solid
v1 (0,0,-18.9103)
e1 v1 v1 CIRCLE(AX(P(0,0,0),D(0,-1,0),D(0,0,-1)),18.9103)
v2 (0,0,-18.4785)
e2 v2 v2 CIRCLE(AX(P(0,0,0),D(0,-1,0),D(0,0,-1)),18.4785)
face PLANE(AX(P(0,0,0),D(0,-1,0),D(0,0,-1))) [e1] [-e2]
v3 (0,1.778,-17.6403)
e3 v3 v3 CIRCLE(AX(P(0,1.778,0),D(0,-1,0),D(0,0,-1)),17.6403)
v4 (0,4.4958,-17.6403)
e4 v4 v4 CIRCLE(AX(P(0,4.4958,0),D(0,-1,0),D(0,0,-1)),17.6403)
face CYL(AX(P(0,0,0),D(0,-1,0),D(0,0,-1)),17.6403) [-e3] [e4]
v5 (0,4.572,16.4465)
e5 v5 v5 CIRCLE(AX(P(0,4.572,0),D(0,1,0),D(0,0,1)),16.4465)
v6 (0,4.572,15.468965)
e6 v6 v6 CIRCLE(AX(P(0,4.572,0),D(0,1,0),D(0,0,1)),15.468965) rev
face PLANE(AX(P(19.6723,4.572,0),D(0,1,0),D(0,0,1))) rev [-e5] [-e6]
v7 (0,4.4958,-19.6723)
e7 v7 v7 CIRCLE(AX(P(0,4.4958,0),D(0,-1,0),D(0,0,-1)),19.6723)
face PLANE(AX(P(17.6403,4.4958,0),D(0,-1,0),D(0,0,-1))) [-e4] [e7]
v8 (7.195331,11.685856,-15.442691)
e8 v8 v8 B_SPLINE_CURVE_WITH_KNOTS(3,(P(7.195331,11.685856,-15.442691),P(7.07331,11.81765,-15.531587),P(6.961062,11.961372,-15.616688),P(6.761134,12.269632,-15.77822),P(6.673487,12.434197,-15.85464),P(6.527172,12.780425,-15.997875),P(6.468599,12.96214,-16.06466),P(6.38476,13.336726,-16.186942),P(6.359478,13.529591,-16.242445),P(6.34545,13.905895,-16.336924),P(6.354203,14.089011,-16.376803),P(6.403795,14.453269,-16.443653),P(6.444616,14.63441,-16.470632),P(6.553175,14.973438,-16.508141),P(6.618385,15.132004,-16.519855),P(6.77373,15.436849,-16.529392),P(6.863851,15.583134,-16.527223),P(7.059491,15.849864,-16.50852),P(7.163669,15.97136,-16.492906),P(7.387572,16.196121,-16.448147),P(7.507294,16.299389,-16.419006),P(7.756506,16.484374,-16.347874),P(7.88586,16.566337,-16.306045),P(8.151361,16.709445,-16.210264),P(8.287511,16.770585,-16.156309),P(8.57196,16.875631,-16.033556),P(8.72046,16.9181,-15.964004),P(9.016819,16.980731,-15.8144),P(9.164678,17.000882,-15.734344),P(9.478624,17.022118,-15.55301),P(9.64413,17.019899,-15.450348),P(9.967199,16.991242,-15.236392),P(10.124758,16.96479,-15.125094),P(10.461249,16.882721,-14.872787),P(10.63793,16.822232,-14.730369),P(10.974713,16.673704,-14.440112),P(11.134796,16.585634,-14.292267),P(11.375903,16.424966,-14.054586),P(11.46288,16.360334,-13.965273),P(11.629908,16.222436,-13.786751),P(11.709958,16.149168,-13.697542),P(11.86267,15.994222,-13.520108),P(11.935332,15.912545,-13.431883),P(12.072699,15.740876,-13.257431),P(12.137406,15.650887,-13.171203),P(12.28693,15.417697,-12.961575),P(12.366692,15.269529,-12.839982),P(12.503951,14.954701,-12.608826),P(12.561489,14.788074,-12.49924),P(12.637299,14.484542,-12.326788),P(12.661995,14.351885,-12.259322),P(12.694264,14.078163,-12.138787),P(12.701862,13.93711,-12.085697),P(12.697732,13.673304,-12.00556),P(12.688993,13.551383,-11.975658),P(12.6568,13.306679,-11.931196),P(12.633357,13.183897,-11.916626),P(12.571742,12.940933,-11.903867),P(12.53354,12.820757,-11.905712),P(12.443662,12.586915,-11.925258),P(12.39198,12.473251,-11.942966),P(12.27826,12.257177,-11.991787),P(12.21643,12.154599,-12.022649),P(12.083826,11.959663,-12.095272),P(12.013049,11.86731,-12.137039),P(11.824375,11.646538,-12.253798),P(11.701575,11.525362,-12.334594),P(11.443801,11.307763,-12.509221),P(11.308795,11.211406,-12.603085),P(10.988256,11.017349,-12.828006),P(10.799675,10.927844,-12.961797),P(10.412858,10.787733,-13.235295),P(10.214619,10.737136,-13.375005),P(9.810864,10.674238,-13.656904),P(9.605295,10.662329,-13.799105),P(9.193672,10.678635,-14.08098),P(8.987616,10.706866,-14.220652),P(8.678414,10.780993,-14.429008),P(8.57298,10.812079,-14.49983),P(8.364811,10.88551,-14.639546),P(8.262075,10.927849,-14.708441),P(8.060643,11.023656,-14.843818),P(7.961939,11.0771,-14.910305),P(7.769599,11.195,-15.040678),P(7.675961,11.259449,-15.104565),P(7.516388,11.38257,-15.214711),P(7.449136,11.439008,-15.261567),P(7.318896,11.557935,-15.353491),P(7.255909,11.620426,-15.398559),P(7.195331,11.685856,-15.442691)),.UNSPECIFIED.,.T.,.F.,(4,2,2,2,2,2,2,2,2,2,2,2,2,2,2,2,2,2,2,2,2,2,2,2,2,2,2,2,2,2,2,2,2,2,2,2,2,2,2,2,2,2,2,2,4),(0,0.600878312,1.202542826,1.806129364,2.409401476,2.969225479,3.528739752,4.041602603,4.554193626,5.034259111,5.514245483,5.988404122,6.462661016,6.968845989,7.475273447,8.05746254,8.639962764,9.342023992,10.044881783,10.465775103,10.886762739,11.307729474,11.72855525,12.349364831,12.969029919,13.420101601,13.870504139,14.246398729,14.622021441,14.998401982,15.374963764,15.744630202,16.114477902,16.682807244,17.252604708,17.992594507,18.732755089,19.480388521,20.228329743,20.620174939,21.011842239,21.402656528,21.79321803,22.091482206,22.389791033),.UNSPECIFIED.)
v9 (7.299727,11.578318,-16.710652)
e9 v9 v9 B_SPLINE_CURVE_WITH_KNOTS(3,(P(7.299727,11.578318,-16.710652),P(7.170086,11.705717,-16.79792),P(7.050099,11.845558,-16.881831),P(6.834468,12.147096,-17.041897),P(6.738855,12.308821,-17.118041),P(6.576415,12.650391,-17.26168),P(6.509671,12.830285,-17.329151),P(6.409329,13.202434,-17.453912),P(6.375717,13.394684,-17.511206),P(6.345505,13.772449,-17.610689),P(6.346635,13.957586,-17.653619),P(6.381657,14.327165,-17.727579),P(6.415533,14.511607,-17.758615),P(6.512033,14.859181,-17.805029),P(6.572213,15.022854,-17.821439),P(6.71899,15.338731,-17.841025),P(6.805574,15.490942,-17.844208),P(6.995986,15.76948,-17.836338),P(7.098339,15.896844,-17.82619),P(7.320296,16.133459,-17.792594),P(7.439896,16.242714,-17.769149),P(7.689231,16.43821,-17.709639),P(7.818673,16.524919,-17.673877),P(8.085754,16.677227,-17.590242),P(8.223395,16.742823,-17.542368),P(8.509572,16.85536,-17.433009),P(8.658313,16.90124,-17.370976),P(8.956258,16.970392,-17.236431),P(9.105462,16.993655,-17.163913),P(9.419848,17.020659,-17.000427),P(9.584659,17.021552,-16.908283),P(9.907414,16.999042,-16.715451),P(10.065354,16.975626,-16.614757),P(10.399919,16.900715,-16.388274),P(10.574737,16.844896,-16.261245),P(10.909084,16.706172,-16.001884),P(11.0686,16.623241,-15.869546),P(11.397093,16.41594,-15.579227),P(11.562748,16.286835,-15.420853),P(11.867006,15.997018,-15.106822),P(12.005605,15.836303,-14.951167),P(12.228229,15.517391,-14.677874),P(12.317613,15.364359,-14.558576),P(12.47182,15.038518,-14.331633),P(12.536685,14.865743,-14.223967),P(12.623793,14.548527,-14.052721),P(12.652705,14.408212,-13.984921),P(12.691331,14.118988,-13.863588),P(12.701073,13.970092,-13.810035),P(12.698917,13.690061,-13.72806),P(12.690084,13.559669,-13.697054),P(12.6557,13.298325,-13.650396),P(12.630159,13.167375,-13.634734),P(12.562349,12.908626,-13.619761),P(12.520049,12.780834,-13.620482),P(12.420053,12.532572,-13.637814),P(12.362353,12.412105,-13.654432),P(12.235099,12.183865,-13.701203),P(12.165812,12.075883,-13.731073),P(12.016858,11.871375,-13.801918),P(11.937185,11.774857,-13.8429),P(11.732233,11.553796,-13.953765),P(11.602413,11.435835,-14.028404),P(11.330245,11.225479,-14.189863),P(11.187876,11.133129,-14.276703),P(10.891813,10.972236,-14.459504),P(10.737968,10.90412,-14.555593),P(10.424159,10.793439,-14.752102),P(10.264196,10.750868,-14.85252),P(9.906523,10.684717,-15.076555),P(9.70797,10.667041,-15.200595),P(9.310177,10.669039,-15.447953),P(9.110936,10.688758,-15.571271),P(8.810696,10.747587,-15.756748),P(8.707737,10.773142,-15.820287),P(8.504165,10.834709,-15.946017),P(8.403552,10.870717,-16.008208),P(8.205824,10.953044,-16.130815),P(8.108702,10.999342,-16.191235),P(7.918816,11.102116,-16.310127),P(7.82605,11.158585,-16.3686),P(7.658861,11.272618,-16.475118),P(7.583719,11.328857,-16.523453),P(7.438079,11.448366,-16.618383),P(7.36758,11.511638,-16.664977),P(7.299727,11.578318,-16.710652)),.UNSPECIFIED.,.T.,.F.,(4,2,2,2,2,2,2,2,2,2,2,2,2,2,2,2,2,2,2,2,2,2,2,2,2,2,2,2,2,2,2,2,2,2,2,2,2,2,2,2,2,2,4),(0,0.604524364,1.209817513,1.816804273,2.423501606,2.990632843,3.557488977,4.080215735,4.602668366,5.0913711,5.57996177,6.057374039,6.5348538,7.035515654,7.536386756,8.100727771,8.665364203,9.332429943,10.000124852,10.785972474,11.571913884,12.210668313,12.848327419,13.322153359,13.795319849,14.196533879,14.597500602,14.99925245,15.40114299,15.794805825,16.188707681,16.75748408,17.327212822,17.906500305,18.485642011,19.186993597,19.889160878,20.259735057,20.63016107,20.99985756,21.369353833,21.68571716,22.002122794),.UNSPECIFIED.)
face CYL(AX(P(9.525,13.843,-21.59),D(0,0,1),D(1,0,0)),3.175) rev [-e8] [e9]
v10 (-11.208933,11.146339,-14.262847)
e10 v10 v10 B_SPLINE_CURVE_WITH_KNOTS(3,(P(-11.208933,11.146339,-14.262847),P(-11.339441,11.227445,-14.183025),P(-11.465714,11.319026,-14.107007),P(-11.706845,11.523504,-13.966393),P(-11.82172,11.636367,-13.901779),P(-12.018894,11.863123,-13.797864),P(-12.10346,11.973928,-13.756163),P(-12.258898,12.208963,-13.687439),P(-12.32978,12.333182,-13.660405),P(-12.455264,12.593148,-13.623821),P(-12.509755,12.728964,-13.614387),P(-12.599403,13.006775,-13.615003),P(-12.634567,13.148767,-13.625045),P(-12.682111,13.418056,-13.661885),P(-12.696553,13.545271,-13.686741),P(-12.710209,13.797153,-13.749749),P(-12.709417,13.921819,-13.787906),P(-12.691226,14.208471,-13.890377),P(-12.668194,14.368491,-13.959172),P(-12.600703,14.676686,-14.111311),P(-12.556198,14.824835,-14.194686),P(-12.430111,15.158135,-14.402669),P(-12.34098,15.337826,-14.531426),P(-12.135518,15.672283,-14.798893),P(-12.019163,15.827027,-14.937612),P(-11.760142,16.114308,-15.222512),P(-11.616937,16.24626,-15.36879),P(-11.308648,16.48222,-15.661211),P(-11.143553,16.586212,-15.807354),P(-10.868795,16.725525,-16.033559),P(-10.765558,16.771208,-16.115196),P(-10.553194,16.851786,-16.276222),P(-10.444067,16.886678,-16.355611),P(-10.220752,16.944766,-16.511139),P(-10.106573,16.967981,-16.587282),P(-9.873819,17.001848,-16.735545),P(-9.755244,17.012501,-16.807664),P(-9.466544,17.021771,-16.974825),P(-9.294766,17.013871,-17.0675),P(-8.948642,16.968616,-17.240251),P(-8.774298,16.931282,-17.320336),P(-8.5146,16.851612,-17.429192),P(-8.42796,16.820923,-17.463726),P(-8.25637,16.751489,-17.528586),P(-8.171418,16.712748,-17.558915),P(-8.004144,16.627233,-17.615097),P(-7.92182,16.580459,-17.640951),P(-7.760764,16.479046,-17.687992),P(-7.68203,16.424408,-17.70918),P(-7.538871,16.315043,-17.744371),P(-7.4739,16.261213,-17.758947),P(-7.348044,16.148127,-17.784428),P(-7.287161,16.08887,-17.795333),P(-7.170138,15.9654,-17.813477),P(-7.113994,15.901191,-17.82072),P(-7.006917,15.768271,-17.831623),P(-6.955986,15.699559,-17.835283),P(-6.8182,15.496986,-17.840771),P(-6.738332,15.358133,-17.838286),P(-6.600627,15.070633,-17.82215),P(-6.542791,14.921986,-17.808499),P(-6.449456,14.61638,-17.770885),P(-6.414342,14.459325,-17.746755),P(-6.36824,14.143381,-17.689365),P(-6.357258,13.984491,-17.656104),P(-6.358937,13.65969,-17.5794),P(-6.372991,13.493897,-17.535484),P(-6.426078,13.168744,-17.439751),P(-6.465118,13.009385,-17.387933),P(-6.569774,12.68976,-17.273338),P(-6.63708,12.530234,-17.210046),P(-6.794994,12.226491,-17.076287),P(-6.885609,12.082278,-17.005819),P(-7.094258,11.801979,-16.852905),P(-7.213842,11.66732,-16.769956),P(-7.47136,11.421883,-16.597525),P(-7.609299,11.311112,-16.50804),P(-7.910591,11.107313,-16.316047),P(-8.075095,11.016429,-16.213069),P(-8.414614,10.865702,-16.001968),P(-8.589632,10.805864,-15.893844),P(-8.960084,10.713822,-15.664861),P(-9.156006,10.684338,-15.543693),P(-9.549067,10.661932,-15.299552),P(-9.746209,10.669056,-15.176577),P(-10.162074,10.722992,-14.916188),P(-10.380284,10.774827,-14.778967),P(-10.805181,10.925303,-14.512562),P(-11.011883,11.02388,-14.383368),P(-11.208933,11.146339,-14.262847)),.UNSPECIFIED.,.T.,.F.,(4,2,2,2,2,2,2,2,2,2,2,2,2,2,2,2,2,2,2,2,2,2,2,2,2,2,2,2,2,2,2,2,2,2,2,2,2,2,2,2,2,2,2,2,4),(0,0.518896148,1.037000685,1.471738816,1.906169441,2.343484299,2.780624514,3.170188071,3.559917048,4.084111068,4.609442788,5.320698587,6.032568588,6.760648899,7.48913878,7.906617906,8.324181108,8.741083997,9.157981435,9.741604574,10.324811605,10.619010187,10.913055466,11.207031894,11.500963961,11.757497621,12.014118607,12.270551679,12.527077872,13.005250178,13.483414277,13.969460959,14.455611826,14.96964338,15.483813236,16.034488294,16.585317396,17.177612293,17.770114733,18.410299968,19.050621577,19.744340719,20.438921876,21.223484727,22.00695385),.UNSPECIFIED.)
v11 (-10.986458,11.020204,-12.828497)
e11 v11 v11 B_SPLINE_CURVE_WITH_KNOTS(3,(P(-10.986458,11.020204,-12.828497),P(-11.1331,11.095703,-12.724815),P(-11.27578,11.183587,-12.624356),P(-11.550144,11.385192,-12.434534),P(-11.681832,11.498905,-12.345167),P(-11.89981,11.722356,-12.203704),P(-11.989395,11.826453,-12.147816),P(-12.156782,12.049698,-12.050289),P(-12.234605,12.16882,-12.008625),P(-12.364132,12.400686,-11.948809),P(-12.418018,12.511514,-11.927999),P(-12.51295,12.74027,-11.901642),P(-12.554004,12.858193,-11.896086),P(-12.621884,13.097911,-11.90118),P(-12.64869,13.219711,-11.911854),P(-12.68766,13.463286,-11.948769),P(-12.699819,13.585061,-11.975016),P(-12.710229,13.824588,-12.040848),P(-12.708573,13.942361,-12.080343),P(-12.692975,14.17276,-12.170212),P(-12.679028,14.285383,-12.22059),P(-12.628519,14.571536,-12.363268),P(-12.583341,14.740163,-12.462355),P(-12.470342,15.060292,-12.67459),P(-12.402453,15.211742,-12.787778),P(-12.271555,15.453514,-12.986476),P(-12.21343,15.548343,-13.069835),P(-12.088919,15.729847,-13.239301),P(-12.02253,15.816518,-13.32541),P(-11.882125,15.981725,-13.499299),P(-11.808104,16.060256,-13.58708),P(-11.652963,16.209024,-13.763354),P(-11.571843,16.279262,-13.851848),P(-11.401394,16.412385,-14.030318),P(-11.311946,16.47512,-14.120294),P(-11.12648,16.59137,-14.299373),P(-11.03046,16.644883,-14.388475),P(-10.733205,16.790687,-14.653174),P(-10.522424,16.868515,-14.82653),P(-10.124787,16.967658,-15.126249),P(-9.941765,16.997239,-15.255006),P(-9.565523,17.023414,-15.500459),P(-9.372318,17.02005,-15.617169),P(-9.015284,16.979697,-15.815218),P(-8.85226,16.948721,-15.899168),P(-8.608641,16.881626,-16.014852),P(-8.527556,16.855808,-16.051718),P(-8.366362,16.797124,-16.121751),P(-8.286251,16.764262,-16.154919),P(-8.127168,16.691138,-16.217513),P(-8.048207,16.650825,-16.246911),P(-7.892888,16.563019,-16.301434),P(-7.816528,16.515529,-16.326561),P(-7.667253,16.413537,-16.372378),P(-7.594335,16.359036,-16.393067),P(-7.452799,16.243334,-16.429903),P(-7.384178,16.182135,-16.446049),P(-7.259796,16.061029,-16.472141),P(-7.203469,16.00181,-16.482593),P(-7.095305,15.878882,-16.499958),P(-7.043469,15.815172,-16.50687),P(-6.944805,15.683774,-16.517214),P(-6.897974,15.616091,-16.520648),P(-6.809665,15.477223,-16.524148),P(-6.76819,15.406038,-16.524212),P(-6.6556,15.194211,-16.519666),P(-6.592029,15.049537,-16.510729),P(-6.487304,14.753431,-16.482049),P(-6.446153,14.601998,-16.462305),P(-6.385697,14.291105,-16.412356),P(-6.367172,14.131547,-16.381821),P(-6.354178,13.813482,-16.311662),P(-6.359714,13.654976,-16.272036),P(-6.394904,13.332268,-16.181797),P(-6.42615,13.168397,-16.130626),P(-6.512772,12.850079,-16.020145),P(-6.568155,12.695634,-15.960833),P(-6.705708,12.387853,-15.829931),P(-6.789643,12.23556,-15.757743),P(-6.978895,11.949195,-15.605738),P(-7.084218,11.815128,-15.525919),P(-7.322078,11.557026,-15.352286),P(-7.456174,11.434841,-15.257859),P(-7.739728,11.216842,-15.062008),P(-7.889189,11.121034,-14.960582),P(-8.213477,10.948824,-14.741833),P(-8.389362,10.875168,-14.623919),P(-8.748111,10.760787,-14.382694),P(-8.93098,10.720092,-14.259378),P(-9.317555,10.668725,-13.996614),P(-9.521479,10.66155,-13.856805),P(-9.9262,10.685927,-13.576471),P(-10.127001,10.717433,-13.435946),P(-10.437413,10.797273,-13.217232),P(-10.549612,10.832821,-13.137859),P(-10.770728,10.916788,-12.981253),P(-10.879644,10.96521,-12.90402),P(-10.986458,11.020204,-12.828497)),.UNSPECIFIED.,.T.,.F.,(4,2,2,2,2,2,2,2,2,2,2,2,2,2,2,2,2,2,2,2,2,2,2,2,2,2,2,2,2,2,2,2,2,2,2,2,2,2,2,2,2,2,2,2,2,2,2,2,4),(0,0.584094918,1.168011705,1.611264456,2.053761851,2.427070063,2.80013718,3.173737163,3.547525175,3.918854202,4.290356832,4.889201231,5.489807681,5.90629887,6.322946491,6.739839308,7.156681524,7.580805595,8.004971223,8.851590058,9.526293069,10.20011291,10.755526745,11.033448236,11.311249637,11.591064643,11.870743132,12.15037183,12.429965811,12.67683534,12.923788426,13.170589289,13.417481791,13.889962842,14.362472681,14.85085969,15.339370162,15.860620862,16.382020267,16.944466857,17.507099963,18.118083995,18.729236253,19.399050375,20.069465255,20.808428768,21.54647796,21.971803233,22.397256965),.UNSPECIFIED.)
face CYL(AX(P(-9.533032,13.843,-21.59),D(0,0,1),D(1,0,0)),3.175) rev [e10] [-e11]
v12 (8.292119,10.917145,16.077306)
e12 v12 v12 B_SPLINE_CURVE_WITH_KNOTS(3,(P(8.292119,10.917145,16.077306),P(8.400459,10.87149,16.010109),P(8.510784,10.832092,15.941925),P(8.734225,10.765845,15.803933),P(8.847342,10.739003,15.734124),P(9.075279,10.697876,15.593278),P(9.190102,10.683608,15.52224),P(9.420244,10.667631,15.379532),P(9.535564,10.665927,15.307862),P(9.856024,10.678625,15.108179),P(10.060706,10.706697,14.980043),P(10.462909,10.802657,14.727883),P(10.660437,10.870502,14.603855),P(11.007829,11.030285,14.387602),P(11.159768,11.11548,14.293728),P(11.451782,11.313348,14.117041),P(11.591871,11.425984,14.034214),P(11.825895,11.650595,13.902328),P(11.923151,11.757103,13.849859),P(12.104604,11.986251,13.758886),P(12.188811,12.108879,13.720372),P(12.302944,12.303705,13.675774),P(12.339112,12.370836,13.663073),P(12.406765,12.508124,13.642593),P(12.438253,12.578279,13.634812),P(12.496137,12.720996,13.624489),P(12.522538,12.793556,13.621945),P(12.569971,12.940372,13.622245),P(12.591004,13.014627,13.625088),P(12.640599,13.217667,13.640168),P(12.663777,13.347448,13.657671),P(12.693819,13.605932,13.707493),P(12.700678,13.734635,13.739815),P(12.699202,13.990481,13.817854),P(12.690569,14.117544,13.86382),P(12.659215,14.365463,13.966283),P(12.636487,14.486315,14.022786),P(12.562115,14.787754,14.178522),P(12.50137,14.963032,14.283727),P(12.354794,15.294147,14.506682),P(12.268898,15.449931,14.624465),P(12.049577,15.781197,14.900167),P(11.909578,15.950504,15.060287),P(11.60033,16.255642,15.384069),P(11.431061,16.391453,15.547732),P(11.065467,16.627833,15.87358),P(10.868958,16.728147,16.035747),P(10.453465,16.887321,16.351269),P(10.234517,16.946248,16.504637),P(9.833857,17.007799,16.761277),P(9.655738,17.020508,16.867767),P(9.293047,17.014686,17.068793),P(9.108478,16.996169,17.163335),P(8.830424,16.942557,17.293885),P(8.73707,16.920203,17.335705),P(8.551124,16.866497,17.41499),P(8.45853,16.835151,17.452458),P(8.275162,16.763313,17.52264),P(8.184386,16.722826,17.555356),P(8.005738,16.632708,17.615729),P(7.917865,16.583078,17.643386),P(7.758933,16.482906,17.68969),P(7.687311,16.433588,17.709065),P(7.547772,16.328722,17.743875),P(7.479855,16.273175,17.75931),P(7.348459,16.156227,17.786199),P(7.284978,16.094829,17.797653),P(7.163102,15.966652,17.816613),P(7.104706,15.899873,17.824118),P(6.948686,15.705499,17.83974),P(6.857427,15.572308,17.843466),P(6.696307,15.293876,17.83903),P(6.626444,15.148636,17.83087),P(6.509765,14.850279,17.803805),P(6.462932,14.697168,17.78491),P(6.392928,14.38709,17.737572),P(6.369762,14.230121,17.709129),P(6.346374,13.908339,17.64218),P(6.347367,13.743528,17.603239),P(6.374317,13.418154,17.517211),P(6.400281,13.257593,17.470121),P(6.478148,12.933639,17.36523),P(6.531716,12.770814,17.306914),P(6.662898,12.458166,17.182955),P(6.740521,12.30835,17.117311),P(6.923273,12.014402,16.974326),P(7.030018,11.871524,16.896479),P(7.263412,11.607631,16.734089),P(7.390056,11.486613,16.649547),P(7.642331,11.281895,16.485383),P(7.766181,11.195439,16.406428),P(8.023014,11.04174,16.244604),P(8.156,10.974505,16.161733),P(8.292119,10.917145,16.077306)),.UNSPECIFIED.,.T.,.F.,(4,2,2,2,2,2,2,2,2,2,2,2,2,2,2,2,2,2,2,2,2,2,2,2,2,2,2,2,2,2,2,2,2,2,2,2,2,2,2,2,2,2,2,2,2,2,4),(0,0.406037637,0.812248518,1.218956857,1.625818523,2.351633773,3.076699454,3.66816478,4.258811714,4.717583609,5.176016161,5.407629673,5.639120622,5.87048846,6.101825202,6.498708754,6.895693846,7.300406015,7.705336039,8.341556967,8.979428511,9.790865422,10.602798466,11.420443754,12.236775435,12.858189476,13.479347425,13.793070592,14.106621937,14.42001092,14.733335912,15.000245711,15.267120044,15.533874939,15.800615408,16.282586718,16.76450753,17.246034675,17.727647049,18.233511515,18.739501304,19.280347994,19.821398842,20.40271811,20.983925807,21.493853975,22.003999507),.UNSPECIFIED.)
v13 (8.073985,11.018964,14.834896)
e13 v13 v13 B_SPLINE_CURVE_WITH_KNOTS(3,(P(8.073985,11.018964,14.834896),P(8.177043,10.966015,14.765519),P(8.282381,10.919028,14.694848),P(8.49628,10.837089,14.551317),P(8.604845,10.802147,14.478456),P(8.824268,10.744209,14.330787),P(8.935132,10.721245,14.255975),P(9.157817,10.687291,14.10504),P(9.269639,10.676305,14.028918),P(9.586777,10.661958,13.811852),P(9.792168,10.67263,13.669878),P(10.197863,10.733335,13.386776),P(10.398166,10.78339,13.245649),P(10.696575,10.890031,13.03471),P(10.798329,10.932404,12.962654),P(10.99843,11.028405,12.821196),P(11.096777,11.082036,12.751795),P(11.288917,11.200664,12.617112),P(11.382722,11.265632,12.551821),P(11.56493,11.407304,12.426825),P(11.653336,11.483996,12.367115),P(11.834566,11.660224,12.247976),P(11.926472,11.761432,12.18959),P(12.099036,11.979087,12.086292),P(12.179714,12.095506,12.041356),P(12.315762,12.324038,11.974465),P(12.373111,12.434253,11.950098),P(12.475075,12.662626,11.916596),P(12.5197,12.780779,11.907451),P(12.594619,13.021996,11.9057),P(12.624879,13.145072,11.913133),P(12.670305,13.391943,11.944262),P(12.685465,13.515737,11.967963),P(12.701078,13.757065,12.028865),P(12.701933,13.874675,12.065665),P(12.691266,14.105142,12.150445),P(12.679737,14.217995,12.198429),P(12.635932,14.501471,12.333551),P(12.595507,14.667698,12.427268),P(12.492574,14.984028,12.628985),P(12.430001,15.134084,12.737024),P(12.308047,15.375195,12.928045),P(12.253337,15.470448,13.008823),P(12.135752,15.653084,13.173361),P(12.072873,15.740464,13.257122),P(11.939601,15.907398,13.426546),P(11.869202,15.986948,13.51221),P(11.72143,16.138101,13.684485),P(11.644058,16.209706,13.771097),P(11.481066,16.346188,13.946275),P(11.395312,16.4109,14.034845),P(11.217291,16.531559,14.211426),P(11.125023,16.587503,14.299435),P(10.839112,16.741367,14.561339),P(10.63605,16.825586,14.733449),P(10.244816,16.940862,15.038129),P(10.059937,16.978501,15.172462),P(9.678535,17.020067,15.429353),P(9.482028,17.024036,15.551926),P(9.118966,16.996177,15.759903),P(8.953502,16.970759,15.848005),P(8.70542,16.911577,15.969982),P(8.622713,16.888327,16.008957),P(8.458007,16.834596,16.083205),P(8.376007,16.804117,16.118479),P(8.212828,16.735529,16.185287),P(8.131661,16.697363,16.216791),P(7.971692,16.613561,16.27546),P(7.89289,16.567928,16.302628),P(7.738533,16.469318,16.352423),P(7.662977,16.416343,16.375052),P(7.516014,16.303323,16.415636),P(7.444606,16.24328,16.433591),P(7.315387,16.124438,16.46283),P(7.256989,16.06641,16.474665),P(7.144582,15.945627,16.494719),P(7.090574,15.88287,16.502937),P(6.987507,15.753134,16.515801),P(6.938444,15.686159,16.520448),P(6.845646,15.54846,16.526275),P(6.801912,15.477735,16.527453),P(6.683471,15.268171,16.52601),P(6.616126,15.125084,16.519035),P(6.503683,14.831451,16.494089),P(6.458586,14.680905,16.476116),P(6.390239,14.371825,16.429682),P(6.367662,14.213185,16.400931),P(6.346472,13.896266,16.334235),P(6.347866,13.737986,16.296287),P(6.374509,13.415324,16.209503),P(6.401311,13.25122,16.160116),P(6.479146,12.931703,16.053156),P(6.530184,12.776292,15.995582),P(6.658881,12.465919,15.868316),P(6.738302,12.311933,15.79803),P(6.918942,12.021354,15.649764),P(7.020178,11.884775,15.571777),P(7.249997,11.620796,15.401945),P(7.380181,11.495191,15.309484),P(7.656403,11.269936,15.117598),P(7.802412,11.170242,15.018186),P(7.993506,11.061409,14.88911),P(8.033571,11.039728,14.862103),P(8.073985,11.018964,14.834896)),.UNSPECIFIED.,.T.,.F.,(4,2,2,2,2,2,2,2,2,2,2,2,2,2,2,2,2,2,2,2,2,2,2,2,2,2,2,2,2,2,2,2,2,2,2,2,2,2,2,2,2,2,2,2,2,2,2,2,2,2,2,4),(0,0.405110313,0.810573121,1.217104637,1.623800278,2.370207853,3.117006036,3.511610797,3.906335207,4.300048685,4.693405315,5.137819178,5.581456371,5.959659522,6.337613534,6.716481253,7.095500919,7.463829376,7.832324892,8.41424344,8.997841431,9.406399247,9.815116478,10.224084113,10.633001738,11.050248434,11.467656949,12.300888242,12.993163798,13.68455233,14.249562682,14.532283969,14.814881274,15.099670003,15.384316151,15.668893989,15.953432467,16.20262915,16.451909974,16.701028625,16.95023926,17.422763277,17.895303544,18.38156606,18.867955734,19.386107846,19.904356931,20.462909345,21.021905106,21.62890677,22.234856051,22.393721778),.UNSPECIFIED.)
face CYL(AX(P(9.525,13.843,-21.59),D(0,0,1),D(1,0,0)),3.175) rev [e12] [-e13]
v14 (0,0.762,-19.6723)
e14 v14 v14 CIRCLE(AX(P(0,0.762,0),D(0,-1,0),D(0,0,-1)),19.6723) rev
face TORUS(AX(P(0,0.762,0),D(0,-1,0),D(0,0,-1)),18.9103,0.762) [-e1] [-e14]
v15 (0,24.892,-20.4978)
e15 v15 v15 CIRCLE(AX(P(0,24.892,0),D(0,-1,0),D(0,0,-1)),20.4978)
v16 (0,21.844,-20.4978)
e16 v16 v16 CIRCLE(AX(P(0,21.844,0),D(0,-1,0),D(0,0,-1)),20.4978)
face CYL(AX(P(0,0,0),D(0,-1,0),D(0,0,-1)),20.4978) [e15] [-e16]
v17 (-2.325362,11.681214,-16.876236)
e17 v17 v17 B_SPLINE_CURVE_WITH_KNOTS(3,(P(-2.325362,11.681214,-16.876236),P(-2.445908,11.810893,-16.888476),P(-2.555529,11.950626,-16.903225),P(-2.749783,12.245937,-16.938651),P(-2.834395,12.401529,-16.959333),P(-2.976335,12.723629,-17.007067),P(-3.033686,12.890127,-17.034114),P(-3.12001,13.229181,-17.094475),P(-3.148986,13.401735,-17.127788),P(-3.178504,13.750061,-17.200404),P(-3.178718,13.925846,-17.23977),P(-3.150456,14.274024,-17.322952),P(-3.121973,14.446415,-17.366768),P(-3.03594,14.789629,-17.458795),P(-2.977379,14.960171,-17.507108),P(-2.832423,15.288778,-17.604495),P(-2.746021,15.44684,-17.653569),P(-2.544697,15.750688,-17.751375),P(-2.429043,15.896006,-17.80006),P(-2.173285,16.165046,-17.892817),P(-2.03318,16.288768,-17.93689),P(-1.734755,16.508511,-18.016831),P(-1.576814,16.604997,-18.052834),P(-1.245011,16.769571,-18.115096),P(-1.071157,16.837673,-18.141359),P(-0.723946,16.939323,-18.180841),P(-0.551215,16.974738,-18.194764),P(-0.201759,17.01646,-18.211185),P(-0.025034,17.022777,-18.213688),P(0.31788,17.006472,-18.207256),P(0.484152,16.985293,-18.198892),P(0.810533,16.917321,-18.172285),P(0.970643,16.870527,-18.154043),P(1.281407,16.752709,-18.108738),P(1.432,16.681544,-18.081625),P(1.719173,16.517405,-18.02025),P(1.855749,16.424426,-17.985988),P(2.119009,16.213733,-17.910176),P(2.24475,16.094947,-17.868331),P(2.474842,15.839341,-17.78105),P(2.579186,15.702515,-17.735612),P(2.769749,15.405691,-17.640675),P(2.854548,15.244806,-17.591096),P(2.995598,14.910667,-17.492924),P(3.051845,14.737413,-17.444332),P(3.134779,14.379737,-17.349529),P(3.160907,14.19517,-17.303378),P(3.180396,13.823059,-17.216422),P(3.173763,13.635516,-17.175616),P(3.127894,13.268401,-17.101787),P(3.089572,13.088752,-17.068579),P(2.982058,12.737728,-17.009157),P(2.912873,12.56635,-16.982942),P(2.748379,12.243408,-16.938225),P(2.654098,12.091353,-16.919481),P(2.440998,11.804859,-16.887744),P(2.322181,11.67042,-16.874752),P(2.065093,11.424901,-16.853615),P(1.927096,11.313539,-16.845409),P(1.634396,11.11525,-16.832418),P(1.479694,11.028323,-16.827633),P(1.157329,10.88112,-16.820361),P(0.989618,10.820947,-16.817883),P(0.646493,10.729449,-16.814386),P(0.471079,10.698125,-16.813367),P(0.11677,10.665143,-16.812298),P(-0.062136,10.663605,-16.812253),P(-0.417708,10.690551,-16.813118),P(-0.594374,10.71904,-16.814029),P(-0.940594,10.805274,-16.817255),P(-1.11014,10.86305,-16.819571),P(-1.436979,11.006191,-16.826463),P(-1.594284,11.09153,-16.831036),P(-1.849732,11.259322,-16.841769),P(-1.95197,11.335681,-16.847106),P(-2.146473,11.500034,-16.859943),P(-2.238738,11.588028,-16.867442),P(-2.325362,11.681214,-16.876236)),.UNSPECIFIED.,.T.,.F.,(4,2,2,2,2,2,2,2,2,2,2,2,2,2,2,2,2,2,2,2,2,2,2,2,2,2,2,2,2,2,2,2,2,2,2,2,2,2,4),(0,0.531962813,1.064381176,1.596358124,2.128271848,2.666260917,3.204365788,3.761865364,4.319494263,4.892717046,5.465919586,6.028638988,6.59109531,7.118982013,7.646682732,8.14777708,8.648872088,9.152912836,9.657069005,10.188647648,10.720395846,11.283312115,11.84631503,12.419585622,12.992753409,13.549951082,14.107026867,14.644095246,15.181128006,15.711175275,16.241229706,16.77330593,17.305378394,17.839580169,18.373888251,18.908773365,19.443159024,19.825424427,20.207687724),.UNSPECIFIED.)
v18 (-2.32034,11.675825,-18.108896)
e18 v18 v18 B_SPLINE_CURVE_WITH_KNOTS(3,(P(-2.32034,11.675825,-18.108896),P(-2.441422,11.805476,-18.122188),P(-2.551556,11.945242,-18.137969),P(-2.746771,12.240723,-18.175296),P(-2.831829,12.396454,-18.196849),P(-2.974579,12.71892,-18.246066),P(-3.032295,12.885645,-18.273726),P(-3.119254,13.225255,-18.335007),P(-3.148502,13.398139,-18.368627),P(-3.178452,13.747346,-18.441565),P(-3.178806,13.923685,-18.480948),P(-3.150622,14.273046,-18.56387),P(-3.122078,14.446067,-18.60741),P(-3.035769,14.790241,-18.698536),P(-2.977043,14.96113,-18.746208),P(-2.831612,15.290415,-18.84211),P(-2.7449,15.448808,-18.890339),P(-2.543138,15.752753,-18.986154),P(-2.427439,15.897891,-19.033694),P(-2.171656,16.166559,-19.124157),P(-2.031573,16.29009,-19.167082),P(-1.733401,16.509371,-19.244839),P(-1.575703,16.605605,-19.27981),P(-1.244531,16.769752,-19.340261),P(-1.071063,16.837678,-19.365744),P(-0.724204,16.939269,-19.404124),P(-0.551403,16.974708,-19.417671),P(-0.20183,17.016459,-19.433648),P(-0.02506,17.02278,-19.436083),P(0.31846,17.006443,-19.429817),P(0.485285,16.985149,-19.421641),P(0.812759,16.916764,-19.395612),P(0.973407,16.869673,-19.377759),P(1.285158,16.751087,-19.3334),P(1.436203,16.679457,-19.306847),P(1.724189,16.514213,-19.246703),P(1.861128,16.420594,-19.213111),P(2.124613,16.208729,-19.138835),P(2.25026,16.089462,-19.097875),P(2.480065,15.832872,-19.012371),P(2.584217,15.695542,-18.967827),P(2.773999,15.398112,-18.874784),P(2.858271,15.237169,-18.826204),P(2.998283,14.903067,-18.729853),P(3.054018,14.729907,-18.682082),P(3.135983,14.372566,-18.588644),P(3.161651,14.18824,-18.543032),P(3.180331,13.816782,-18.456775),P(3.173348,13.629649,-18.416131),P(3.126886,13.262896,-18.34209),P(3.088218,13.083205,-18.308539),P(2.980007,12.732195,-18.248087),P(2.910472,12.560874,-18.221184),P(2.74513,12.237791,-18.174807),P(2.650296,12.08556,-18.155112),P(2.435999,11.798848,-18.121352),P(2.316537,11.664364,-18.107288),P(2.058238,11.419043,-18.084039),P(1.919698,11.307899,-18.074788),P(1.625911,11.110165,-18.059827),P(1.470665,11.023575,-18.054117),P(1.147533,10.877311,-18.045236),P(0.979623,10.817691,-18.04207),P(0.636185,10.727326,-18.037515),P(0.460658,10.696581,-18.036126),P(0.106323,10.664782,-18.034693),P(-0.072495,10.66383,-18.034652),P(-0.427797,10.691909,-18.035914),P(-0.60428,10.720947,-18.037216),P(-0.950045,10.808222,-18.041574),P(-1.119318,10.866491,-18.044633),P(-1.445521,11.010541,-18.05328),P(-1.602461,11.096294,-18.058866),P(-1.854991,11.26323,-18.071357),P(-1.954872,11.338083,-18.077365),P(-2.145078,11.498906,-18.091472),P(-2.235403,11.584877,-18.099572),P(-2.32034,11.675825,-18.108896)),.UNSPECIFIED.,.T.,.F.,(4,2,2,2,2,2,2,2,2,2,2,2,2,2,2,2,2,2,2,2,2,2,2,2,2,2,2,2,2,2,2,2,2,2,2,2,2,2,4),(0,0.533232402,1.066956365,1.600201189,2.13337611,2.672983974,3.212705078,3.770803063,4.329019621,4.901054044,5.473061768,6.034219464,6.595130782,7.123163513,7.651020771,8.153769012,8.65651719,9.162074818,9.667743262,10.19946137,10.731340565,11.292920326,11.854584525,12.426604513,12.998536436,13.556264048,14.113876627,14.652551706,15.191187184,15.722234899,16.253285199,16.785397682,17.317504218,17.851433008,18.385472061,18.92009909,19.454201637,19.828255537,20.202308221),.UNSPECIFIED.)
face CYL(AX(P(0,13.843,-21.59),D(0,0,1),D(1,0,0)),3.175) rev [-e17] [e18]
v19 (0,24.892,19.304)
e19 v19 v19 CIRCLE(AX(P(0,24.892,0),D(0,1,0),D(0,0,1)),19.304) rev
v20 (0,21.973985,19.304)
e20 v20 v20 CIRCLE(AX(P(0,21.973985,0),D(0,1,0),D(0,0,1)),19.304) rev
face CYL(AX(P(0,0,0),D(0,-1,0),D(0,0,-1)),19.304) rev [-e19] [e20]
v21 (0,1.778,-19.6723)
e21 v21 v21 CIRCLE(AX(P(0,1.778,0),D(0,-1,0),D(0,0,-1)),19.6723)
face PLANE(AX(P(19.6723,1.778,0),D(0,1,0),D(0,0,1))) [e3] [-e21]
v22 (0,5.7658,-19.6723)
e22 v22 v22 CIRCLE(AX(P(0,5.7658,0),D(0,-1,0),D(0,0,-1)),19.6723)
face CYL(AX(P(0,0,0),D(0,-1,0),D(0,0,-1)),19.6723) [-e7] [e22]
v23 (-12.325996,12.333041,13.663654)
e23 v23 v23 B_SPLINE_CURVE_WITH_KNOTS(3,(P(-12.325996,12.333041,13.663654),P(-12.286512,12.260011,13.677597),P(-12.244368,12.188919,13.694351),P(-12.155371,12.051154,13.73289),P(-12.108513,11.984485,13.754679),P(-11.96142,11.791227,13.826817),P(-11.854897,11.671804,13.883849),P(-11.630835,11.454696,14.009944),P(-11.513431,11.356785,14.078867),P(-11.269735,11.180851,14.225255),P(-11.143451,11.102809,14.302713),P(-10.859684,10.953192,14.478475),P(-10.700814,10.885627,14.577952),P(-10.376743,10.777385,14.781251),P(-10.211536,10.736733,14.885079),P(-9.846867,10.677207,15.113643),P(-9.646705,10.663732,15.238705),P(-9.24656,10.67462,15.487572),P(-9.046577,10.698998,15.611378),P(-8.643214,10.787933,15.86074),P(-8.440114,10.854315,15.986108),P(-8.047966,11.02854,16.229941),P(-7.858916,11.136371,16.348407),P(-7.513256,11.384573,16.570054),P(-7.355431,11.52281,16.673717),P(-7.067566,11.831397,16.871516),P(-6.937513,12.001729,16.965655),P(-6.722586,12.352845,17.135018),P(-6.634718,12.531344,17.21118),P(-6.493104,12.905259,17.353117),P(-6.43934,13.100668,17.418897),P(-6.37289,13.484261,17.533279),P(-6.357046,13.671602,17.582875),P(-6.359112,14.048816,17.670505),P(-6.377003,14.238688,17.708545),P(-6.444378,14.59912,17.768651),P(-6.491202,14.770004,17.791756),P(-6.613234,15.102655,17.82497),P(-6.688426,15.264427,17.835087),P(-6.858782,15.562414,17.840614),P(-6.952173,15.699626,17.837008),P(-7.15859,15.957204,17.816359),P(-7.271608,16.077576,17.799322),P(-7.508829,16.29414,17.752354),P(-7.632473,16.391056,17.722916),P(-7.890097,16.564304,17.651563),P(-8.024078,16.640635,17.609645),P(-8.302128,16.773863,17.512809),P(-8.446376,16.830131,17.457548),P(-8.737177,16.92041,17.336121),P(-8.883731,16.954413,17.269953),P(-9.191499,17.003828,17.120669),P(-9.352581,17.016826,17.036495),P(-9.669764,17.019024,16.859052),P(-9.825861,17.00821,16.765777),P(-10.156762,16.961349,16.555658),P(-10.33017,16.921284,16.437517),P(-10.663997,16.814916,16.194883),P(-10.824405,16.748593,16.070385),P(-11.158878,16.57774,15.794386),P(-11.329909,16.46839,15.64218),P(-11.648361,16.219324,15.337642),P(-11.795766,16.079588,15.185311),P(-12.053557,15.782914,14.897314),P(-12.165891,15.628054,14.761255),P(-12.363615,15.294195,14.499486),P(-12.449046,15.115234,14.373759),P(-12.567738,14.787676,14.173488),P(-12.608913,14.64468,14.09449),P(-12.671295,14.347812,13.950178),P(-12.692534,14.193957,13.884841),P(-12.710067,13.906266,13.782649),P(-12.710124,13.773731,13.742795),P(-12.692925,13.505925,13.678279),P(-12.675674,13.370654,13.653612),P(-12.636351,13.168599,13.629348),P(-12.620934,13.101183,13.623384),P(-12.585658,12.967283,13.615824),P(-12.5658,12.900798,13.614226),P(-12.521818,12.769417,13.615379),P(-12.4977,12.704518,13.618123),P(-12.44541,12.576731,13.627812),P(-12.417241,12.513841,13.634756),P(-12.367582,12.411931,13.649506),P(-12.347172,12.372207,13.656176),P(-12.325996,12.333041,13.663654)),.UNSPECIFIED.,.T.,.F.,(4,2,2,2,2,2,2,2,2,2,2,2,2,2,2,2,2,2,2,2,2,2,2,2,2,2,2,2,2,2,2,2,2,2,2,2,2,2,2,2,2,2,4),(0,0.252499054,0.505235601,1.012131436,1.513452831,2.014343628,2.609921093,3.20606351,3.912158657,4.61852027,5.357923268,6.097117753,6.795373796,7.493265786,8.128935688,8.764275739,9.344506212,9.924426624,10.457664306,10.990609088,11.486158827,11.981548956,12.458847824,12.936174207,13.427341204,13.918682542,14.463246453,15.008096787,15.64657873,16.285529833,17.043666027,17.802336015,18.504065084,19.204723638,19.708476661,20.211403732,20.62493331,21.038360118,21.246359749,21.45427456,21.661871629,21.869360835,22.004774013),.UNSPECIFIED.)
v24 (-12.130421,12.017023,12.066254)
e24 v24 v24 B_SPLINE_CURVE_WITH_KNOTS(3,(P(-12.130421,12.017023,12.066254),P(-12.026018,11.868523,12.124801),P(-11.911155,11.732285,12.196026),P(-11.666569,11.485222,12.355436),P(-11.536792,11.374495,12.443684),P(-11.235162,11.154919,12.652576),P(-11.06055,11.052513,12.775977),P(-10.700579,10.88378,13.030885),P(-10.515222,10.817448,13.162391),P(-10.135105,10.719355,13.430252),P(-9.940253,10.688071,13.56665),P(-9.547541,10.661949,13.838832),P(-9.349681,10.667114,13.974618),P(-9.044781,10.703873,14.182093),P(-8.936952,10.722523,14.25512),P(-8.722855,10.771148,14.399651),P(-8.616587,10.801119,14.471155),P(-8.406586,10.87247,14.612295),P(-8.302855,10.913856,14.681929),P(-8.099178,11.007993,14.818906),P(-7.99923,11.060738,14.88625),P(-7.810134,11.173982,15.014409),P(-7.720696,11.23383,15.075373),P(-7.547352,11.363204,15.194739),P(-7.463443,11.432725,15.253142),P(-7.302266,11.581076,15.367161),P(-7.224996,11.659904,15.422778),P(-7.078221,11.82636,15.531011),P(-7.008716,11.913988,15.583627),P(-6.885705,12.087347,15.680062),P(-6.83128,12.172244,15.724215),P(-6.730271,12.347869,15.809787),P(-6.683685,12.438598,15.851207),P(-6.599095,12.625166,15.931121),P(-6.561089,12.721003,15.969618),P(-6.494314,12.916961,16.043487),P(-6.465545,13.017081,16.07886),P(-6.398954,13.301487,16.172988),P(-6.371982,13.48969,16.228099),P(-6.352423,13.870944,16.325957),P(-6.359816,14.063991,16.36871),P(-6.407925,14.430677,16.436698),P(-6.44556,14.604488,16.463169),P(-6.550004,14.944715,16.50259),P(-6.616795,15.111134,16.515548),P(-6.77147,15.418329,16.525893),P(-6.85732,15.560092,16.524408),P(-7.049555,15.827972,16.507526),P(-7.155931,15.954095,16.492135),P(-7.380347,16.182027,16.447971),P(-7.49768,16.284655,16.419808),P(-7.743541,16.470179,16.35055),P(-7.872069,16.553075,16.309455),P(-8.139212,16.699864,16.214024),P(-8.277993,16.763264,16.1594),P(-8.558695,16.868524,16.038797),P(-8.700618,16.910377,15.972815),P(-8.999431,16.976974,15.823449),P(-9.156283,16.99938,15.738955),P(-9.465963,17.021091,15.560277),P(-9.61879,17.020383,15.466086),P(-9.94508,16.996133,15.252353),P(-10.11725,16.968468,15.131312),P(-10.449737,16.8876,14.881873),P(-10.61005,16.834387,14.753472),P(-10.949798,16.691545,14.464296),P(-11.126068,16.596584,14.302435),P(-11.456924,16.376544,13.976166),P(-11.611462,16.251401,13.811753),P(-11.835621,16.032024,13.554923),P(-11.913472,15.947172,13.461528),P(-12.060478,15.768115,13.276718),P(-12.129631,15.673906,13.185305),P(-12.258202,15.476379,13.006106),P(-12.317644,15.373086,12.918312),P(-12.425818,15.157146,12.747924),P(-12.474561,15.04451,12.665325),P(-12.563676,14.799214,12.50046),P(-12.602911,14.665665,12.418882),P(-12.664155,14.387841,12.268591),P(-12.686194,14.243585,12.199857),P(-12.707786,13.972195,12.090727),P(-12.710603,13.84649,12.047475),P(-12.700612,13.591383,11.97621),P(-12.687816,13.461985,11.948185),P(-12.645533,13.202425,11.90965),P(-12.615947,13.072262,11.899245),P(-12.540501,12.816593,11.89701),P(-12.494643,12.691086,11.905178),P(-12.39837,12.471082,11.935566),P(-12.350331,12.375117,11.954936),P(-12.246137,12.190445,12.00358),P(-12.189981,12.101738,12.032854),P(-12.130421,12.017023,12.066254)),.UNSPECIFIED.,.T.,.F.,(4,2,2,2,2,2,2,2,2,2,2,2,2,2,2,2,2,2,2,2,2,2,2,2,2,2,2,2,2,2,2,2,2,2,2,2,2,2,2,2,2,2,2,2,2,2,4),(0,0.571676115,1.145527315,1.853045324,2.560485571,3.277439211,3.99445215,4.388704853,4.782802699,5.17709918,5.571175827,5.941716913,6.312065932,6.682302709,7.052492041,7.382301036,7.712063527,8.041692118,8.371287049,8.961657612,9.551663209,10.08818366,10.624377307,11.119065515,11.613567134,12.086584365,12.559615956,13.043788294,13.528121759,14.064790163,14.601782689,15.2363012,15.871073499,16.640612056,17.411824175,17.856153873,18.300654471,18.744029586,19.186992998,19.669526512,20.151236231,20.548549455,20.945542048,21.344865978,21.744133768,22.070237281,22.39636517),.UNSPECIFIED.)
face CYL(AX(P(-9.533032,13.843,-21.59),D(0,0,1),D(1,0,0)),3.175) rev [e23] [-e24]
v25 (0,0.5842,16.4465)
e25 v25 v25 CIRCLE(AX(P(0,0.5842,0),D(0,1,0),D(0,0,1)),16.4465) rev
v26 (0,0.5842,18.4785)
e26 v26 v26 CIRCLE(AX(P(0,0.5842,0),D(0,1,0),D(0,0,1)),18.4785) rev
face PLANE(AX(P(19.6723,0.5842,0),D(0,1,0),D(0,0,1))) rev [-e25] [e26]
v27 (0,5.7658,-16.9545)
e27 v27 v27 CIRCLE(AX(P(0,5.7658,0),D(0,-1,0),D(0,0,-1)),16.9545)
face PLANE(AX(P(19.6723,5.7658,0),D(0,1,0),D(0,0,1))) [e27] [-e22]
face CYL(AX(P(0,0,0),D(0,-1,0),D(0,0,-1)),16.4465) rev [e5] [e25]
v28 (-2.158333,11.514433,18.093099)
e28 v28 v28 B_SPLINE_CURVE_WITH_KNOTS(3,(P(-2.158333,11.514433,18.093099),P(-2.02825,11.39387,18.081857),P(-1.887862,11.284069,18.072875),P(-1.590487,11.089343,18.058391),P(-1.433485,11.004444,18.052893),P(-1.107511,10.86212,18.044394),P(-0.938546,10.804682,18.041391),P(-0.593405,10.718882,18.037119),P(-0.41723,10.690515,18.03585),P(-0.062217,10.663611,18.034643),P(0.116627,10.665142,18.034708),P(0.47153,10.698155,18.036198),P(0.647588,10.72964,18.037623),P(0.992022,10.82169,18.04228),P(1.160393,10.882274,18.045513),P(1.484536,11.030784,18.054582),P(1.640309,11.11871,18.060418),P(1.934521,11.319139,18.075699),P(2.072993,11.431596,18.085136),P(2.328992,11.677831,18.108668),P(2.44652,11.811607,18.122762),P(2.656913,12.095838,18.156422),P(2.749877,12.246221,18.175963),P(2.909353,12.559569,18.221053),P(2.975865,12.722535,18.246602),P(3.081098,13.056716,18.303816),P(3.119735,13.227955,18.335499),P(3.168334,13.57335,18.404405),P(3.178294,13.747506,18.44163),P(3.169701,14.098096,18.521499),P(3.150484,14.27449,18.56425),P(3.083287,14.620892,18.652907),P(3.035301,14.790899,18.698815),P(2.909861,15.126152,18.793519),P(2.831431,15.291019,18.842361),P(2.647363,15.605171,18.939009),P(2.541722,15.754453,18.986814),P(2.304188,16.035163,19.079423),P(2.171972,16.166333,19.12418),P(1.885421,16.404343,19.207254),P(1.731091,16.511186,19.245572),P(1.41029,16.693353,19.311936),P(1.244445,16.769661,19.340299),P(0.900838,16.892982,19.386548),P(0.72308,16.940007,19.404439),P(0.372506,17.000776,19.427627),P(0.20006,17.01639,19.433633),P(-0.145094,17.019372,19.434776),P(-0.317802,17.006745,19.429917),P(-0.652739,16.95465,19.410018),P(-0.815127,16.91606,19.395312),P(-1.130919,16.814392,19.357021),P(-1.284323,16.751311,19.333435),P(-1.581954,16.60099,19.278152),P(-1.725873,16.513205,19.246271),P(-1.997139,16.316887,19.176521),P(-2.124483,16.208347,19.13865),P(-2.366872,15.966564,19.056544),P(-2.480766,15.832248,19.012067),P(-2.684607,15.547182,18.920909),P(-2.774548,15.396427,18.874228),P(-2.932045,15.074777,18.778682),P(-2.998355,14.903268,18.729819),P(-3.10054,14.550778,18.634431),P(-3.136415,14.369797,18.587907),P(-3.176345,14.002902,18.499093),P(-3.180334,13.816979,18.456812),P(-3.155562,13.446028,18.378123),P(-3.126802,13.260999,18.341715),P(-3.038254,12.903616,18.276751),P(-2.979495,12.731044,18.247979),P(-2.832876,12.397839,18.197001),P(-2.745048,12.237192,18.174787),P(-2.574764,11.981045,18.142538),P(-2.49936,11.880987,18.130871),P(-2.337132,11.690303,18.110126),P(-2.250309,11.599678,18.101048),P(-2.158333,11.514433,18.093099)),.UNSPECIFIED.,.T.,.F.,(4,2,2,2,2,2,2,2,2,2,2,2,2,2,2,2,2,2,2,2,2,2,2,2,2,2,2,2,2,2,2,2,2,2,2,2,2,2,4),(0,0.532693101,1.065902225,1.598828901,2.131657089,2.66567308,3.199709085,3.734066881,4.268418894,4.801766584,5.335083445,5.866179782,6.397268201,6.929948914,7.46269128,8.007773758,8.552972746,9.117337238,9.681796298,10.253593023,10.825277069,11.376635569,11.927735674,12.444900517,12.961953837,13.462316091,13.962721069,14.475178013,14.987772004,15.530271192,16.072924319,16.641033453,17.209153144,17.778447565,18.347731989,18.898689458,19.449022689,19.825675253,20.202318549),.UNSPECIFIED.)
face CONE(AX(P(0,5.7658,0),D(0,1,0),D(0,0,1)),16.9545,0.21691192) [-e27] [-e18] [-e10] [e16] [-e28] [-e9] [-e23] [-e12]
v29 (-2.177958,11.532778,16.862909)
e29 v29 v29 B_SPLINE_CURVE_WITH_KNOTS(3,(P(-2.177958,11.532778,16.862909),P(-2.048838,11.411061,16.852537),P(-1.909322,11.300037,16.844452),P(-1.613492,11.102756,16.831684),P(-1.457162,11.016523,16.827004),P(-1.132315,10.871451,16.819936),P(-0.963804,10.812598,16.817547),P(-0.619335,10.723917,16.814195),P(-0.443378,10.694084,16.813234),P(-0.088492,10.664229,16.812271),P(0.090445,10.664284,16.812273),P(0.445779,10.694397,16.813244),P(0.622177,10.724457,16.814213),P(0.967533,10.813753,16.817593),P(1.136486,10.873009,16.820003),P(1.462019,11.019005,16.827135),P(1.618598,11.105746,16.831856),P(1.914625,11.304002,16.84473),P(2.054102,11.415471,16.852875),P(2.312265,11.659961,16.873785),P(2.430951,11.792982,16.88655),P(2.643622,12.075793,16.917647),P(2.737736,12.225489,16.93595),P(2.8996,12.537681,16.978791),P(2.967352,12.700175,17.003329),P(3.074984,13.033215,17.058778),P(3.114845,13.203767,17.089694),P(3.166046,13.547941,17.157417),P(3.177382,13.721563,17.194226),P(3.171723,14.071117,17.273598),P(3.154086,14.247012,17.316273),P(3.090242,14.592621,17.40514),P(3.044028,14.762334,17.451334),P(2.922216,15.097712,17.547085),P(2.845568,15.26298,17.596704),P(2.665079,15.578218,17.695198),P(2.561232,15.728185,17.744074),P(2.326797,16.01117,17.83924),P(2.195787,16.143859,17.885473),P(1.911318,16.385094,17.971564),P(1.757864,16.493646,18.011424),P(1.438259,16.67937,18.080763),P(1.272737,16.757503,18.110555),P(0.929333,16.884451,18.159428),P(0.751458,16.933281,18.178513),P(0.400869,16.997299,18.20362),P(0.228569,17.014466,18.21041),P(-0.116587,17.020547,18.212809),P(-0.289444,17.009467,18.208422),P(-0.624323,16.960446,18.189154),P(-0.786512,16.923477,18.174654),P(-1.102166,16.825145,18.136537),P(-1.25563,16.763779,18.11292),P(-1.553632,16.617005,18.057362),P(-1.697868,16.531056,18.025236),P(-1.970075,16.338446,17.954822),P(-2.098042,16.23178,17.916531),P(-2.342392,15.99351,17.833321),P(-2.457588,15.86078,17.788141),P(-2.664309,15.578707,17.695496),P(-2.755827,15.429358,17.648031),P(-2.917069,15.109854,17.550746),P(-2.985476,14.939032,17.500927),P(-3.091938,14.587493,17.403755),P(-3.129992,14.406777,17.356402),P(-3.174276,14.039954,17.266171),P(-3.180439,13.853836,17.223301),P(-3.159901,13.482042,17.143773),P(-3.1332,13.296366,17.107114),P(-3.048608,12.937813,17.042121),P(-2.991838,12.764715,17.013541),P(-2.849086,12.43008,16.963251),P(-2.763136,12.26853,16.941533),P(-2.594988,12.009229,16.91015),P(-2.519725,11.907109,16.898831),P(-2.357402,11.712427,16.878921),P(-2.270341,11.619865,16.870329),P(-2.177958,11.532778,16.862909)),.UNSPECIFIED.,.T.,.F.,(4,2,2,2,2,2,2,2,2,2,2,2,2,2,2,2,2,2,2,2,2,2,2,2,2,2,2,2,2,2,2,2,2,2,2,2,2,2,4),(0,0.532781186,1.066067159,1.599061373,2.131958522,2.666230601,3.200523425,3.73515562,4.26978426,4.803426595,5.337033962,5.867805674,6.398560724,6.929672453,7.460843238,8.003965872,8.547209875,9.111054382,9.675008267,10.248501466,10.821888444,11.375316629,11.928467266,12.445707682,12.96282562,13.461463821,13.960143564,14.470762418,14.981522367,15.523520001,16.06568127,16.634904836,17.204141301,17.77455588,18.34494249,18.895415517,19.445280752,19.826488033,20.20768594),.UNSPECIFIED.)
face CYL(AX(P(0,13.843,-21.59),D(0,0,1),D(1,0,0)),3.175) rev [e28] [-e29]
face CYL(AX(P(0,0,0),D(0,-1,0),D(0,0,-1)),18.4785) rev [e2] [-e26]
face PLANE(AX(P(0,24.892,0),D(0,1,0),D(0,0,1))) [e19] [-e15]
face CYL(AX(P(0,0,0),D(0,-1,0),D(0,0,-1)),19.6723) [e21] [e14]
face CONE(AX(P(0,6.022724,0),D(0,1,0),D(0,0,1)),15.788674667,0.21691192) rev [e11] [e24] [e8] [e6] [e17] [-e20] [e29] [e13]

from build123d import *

# Parameters (mm, degrees)
FILLET1_R          = 0.762
SKETCH2_R          = 3.175
CUT_EXTRUDE1_DEPTH = 21.59


# Read off the part's stored shape, not the designer's step: Shell1
with BuildPart() as part:
    # Sketch1 → Revolve1 (revolve)
    with BuildSketch(Plane.XY, mode=Mode.PRIVATE) as revolve1_sk:
        Polygon((19.6723, 0), (19.6723, 1.778), (17.6403, 1.778), (17.6403, 4.4958), (19.6723, 4.4958), (19.6723, 5.7658), (16.9545, 5.7658), (20.4978, 21.844), (20.4978, 24.892), (0, 24.892), (0, 0), align=None)
    revolve(revolve1_sk.sketch.rotate(Axis((0, 0, 0), (0, 1, 0)), 90), axis=Axis((0, 0, 0), (0, 1, 0)))

    # Fillet1
    fillet1_edges = [part.edges().sort_by_distance(p)[0] for p in [
        (0, 0, 19.6723),
    ]]
    fillet(fillet1_edges, radius=FILLET1_R)

    # Shell1 outline → Shell1 (revolve, cut)
    with BuildSketch(Plane.XY):
        Polygon((16.4465, 4.572), (15.468965439, 4.572), (19.304, 21.973984782), (19.304, 24.892), (0, 24.892), (0, 0), (18.4785, 0), (18.4785, 0.5842), (16.4465, 0.5842), align=None)
    revolve(axis=Axis((0, 0, 0), (0, 1, 0)), mode=Mode.SUBTRACT)

    # Sketch2 → Cut-Extrude1 (cut, symmetric)
    with BuildSketch(Plane.XY):
        with Locations(Location((0, 13.843, 0), (0, 0, 270.000000005))):
            Circle(SKETCH2_R)
        with Locations(Location((-9.533032066, 13.843, 0), (0, 0, 215.10740663))):
            Circle(SKETCH2_R)
        with Locations(Location((9.525, 13.843, 0), (0, 0, 247.150680843))):
            Circle(SKETCH2_R)
    extrude(amount=CUT_EXTRUDE1_DEPTH, both=True, mode=Mode.SUBTRACT)


solid = part.part
